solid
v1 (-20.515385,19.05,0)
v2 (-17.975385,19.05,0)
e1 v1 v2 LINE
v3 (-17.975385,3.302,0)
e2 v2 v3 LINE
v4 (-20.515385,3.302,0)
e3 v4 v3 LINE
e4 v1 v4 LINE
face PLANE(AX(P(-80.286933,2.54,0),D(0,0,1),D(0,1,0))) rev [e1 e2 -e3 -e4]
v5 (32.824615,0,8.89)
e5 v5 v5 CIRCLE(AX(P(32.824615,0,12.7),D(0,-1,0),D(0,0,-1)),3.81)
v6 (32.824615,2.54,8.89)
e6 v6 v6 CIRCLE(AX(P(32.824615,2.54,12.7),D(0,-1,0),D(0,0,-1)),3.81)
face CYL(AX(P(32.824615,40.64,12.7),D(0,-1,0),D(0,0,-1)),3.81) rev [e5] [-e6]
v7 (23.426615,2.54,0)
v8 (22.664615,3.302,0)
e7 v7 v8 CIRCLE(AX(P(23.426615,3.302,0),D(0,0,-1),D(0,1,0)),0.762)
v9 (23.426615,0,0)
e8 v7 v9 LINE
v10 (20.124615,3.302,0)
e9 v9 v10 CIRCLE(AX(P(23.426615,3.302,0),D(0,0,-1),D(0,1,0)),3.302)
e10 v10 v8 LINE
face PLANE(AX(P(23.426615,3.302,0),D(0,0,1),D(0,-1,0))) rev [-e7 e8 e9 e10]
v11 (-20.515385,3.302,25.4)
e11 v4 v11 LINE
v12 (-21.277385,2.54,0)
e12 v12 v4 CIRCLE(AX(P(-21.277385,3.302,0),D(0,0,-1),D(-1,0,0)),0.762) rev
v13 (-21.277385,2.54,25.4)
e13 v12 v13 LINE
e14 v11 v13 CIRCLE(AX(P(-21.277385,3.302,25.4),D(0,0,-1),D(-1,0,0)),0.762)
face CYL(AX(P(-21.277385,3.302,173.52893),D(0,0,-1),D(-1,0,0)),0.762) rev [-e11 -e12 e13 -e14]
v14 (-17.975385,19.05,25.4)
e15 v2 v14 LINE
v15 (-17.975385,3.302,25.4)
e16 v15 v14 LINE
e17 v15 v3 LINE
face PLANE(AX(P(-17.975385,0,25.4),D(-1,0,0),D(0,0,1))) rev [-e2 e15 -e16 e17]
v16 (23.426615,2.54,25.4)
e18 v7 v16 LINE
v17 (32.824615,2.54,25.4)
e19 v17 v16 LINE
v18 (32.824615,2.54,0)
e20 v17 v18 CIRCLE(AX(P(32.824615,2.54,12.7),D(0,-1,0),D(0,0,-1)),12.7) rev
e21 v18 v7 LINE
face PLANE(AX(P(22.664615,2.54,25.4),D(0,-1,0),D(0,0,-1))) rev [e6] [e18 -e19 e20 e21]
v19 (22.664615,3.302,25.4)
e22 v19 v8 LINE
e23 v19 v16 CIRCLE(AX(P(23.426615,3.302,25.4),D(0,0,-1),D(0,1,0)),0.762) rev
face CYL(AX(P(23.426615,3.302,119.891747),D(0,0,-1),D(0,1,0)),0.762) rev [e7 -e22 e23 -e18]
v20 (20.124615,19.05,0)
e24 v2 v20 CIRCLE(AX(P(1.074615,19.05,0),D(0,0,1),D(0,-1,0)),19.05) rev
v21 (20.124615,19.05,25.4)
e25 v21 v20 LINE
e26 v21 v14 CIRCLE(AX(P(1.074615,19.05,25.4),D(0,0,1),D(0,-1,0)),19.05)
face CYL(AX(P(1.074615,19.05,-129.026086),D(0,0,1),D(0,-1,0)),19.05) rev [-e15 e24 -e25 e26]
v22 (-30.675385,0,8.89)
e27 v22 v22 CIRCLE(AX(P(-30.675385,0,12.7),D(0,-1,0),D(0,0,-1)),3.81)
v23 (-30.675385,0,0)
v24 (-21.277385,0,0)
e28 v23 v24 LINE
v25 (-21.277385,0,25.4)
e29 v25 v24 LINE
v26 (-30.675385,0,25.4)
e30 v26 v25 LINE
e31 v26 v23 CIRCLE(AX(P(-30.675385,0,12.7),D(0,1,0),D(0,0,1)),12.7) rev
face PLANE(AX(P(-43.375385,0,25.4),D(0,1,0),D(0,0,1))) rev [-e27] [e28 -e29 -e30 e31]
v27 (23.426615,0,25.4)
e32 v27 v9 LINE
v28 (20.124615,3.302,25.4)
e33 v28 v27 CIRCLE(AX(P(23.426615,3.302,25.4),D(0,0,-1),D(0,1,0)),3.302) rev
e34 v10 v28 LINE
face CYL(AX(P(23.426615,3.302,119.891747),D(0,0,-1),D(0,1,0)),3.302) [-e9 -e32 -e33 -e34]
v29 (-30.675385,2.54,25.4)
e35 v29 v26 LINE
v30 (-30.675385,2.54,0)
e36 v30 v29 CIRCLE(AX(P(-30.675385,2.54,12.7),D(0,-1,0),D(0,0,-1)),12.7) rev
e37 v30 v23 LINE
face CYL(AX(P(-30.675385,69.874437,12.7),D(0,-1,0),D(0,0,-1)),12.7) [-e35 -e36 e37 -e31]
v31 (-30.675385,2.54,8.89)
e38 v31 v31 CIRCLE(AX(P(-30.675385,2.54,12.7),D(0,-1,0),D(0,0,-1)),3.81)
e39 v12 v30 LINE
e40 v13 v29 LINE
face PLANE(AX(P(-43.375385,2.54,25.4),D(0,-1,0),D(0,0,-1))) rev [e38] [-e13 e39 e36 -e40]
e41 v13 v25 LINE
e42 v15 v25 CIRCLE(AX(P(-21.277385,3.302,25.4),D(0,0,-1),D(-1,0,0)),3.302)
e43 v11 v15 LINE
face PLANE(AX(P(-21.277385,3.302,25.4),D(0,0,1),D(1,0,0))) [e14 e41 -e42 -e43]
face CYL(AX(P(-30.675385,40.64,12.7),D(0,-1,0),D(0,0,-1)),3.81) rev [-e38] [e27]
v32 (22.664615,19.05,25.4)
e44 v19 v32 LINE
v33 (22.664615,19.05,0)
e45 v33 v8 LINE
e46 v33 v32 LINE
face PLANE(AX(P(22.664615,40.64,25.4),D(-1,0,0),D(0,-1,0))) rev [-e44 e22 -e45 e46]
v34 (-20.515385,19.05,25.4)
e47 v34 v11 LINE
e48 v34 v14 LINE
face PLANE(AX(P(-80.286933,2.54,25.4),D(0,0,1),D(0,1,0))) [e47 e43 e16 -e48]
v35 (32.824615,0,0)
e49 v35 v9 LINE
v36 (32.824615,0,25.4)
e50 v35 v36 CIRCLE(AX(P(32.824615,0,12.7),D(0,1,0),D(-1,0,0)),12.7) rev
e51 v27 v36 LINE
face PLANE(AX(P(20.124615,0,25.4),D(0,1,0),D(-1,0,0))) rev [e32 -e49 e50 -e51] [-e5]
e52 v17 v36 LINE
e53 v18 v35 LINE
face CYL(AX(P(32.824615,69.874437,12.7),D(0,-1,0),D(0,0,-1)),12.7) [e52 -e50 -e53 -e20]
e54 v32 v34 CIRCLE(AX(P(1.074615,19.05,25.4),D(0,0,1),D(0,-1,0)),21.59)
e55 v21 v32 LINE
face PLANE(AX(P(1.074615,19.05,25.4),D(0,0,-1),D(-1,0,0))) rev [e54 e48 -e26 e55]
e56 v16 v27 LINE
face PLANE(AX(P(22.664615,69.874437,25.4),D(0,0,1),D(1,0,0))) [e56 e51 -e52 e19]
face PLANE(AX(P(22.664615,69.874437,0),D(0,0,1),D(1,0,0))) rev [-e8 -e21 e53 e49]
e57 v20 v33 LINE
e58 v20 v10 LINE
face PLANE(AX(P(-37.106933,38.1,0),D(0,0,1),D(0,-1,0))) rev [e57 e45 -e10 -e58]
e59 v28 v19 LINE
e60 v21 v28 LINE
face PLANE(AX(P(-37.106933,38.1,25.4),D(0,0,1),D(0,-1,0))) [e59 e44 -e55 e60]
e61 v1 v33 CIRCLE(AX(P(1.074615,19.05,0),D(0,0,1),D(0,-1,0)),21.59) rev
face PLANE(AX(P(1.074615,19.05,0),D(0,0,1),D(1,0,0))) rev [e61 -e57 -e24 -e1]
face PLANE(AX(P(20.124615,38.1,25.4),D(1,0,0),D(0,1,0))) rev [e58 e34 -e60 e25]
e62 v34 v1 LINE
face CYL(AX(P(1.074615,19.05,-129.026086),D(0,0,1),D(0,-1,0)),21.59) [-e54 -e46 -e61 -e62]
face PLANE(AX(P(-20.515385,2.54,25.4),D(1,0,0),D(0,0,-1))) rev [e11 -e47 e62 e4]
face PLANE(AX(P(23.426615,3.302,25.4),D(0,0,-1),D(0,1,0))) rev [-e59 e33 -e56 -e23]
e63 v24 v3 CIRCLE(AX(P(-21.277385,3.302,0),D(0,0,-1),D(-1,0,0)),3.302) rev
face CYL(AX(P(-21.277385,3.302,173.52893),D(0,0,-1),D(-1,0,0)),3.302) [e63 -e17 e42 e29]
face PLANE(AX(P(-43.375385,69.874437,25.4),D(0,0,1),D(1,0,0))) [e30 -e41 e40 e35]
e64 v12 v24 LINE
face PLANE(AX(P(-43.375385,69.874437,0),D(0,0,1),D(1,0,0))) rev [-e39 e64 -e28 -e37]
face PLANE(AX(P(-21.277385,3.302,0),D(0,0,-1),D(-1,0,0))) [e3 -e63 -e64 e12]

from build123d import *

# Parameters (mm, degrees)
BOSS_EXTRUDE1_DEPTH        = 25.4
SKETCH3_R                  = 3.81
CUT_EXTRUDE1_DEPTH         = 67.100379771
FILLET1_RADIUS             = 12.7
FILLET1_LENGTH             = 2.54
FILLET2_RADIUS             = 12.7
FILLET2_LENGTH             = 2.54
FILLET4_R                  = 19.05
FILLET5_RADIUS             = 21.59
FILLET5_LENGTH             = 25.4
FLATTEN_BENDS3_START       = 2.54
FLATTEN_BENDS3_OUTLINE_W   = 43.18
FLATTEN_BENDS3_OUTLINE_H   = 25.4
FLATTEN_BENDS3_DEPTH       = 38.1
FLATTEN_BENDS3_2_OUTLINE_W = 38.1
FLATTEN_BENDS3_2_OUTLINE_H = 25.4
FLATTEN_BENDS3_2_OUTLINE_R = 3.81
FLATTEN_BENDS3_2_DEPTH     = 2.54
PROCESS_BENDS3_DEPTH       = 25.4
PROCESS_BENDS3_2_OUTLINE_R = 3.81
PROCESS_BENDS3_2_DEPTH     = 2.54
PROCESS_BENDS3_3_DEPTH     = 25.4


# Read off the part's stored shape, not the designer's step: Flatten-Bends3, Process-Bends3
with BuildPart() as part:
    # Sketch2 → Boss-Extrude1 (new body)
    with BuildSketch(Plane.XY):
        Polygon((-43.375384615, 0), (-17.975384615, 0), (-17.975384615, 38.1), (20.124615385, 38.1), (20.124615385, 0), (45.524615385, 0), (45.524615385, 2.54), (22.664615385, 2.54), (22.664615385, 40.64), (-20.515384615, 40.64), (-20.515384615, 2.54), (-43.375384615, 2.54), align=None)
    extrude(amount=BOSS_EXTRUDE1_DEPTH)

    # Sketch3 → Cut-Extrude1 (cut, through all)
    with BuildSketch(Plane.XZ):
        with Locations(Location((-30.675384615, 12.7, 0), (0, 0, 270))):
            Circle(SKETCH3_R)
        with Locations(Location((32.824615385, 12.7, 0), (0, 0, 270))):
            Circle(SKETCH3_R)
    extrude(amount=-CUT_EXTRUDE1_DEPTH, mode=Mode.SUBTRACT)

    # Fillet1: full round fillet: the end face becomes a half cylinder, R = half its width
    fillet1_face = Plane((45.524615385, 1.27, 12.7), x_dir=(0, 1, 0), z_dir=(1, 0, 0))  # on the end face: x along it, z out of the body
    fillet1_slab = fillet1_face.offset(-FILLET1_RADIUS / 2) * Box(FILLET1_LENGTH, 2 * FILLET1_RADIUS, FILLET1_RADIUS, mode=Mode.PRIVATE)  # the body's end, R deep
    fillet1_round = Plane((32.824615385, 1.27, 12.7), x_dir=(1, 0, 0), z_dir=(0, 1, 0)) * Cylinder(FILLET1_RADIUS, FILLET1_LENGTH, mode=Mode.PRIVATE)  # its axis R under the face
    add(fillet1_slab - fillet1_round, mode=Mode.SUBTRACT)

    # Fillet2: full round fillet: the end face becomes a half cylinder, R = half its width
    fillet2_face = Plane((-43.375384615, 1.27, 12.7), x_dir=(0, -1, 0), z_dir=(-1, 0, 0))  # on the end face: x along it, z out of the body
    fillet2_slab = fillet2_face.offset(-FILLET2_RADIUS / 2) * Box(FILLET2_LENGTH, 2 * FILLET2_RADIUS, FILLET2_RADIUS, mode=Mode.PRIVATE)  # the body's end, R deep
    fillet2_round = Plane((-30.675384615, 1.27, 12.7), x_dir=(-1, 0, 0), z_dir=(0, -1, 0)) * Cylinder(FILLET2_RADIUS, FILLET2_LENGTH, mode=Mode.PRIVATE)  # its axis R under the face
    add(fillet2_slab - fillet2_round, mode=Mode.SUBTRACT)

    # Fillet4
    fillet4_edges = [part.edges().sort_by_distance(p)[0] for p in [
        (20.124615385, 38.1, 12.7),
        (-17.975384615, 38.1, 12.7),
    ]]
    fillet(fillet4_edges, radius=FILLET4_R - 0.0001)  # a hair under: the kernel refuses the full size

    # Fillet5: full round fillet: the end face becomes a half cylinder, R = half its width
    fillet5_face = Plane((1.074615385, 40.64, 12.7), x_dir=(0, 0, 1), z_dir=(0, 1, 0))  # on the end face: x along it, z out of the body
    fillet5_slab = fillet5_face.offset(-FILLET5_RADIUS / 2) * Box(FILLET5_LENGTH, 2 * FILLET5_RADIUS, FILLET5_RADIUS, mode=Mode.PRIVATE)  # the body's end, R deep
    fillet5_round = Plane((1.074615385, 19.05, 12.7), x_dir=(0, 1, 0), z_dir=(0, 0, 1)) * Cylinder(FILLET5_RADIUS, FILLET5_LENGTH, mode=Mode.PRIVATE)  # its axis R under the face
    add(fillet5_slab - fillet5_round, mode=Mode.SUBTRACT)

    # Flatten-Bends3 outline → Flatten-Bends3 (cut)
    with BuildSketch(Plane(origin=(0, 0, 0), x_dir=(1, 0, 0), z_dir=(0, 1, 0)).offset(FLATTEN_BENDS3_START)):
        with Locations((1.074615385, -12.7)):
            Rectangle(FLATTEN_BENDS3_OUTLINE_W, FLATTEN_BENDS3_OUTLINE_H)
    extrude(amount=FLATTEN_BENDS3_DEPTH, mode=Mode.SUBTRACT)

    # Flatten-Bends3 2 outline → Flatten-Bends3 2 (add)
    # profile 1 of 3: a face of its own
    with BuildSketch(Plane(origin=(0, 0, 0), x_dir=(1, 0, 0), z_dir=(0, 1, 0))):
        with Locations((1.074615385, -12.7)):
            Rectangle(FLATTEN_BENDS3_2_OUTLINE_W, FLATTEN_BENDS3_2_OUTLINE_H)
    # profile 2 of 3: a face of its own
    with BuildSketch(Plane(origin=(0, 0, 0), x_dir=(1, 0, 0), z_dir=(0, 1, 0))):
        with BuildLine():
            ThreePointArc((32.824615385, 0), (45.524615385, -12.7), (32.824615385, -25.4))
            Line((32.824615385, -25.4), (89.837494378, -25.4))
            ThreePointArc((89.837494378, -25.4), (102.537494378, -12.7), (89.837494378, 0))
            Line((89.837494378, 0), (32.824615385, 0))
        make_face()
        with Locations((89.837494378, -12.7)):
            Circle(FLATTEN_BENDS3_2_OUTLINE_R, mode=Mode.SUBTRACT)
    # profile 3 of 3: a face of its own
    with BuildSketch(Plane(origin=(0, 0, 0), x_dir=(1, 0, 0), z_dir=(0, 1, 0))):
        with Locations((32.824615385, -12.7)):
            Circle(FLATTEN_BENDS3_2_OUTLINE_R)
    extrude(amount=FLATTEN_BENDS3_2_DEPTH)

    # Process-Bends3 outline → Process-Bends3 (add)
    with BuildSketch(Plane.XY):
        with BuildLine():
            Line((22.664615385, 3.302), (22.664615385, 19.05))
            ThreePointArc((22.664615385, 19.05), (1.074615385, 40.64), (-20.515384615, 19.05))
            Line((-20.515384615, 19.05), (-20.515384615, 3.302))
            ThreePointArc((-20.515384615, 3.302), (-20.738569248, 2.763184633), (-21.277384615, 2.54))
            Line((-21.277384615, 2.54), (-18.064510513, 2.54))
            ThreePointArc((-18.064510513, 2.54), (-17.997741777, 2.918402742), (-17.975384615, 3.302))
            Line((-17.975384615, 3.302), (-17.975384615, 19.05))
            ThreePointArc((-17.975384615, 19.05), (1.074615385, 38.1), (20.124615385, 19.05))
            Line((20.124615385, 19.05), (20.124615385, 3.302))
            ThreePointArc((20.124615385, 3.302), (20.146972547, 2.918402742), (20.213741282, 2.54))
            Line((20.213741282, 2.54), (23.426615385, 2.54))
            ThreePointArc((23.426615385, 2.54), (22.887800018, 2.763184632), (22.664615385, 3.302))
        make_face()
    extrude(amount=PROCESS_BENDS3_DEPTH)

    # Process-Bends3 2 outline → Process-Bends3 2 (cut)
    # profile 1 of 2: a face of its own
    with BuildSketch(Plane(origin=(0, 0, 0), x_dir=(1, 0, 0), z_dir=(0, 1, 0))):
        with Locations((32.824615385, -12.7)):
            Circle(PROCESS_BENDS3_2_OUTLINE_R)
    # profile 2 of 2: a face of its own
    with BuildSketch(Plane(origin=(0, 0, 0), x_dir=(1, 0, 0), z_dir=(0, 1, 0))):
        with BuildLine():
            Line((89.837494378, 0), (32.824615385, 0))
            ThreePointArc((32.824615385, 0), (45.524615385, -12.7), (32.824615385, -25.4))
            Line((32.824615385, -25.4), (89.837494378, -25.4))
            ThreePointArc((89.837494378, -25.4), (102.537494378, -12.7), (89.837494378, 0))
        make_face()
        with Locations((89.837494378, -12.7)):
            Circle(PROCESS_BENDS3_2_OUTLINE_R, mode=Mode.SUBTRACT)
    extrude(amount=PROCESS_BENDS3_2_DEPTH, mode=Mode.SUBTRACT)

    # Process-Bends3 3 outline → Process-Bends3 3 (cut)
    with BuildSketch(Plane.XY):
        with BuildLine():
            ThreePointArc((23.426615385, 0), (21.378801917, 0.711698087), (20.213741282, 2.54))
            Line((20.213741282, 2.54), (-18.064510513, 2.54))
            ThreePointArc((-18.064510513, 2.54), (-19.229571147, 0.711698088), (-21.277384615, 0))
            Line((-21.277384615, 0), (23.426615385, 0))
        make_face()
    extrude(amount=PROCESS_BENDS3_3_DEPTH, mode=Mode.SUBTRACT)


solid = part.part
